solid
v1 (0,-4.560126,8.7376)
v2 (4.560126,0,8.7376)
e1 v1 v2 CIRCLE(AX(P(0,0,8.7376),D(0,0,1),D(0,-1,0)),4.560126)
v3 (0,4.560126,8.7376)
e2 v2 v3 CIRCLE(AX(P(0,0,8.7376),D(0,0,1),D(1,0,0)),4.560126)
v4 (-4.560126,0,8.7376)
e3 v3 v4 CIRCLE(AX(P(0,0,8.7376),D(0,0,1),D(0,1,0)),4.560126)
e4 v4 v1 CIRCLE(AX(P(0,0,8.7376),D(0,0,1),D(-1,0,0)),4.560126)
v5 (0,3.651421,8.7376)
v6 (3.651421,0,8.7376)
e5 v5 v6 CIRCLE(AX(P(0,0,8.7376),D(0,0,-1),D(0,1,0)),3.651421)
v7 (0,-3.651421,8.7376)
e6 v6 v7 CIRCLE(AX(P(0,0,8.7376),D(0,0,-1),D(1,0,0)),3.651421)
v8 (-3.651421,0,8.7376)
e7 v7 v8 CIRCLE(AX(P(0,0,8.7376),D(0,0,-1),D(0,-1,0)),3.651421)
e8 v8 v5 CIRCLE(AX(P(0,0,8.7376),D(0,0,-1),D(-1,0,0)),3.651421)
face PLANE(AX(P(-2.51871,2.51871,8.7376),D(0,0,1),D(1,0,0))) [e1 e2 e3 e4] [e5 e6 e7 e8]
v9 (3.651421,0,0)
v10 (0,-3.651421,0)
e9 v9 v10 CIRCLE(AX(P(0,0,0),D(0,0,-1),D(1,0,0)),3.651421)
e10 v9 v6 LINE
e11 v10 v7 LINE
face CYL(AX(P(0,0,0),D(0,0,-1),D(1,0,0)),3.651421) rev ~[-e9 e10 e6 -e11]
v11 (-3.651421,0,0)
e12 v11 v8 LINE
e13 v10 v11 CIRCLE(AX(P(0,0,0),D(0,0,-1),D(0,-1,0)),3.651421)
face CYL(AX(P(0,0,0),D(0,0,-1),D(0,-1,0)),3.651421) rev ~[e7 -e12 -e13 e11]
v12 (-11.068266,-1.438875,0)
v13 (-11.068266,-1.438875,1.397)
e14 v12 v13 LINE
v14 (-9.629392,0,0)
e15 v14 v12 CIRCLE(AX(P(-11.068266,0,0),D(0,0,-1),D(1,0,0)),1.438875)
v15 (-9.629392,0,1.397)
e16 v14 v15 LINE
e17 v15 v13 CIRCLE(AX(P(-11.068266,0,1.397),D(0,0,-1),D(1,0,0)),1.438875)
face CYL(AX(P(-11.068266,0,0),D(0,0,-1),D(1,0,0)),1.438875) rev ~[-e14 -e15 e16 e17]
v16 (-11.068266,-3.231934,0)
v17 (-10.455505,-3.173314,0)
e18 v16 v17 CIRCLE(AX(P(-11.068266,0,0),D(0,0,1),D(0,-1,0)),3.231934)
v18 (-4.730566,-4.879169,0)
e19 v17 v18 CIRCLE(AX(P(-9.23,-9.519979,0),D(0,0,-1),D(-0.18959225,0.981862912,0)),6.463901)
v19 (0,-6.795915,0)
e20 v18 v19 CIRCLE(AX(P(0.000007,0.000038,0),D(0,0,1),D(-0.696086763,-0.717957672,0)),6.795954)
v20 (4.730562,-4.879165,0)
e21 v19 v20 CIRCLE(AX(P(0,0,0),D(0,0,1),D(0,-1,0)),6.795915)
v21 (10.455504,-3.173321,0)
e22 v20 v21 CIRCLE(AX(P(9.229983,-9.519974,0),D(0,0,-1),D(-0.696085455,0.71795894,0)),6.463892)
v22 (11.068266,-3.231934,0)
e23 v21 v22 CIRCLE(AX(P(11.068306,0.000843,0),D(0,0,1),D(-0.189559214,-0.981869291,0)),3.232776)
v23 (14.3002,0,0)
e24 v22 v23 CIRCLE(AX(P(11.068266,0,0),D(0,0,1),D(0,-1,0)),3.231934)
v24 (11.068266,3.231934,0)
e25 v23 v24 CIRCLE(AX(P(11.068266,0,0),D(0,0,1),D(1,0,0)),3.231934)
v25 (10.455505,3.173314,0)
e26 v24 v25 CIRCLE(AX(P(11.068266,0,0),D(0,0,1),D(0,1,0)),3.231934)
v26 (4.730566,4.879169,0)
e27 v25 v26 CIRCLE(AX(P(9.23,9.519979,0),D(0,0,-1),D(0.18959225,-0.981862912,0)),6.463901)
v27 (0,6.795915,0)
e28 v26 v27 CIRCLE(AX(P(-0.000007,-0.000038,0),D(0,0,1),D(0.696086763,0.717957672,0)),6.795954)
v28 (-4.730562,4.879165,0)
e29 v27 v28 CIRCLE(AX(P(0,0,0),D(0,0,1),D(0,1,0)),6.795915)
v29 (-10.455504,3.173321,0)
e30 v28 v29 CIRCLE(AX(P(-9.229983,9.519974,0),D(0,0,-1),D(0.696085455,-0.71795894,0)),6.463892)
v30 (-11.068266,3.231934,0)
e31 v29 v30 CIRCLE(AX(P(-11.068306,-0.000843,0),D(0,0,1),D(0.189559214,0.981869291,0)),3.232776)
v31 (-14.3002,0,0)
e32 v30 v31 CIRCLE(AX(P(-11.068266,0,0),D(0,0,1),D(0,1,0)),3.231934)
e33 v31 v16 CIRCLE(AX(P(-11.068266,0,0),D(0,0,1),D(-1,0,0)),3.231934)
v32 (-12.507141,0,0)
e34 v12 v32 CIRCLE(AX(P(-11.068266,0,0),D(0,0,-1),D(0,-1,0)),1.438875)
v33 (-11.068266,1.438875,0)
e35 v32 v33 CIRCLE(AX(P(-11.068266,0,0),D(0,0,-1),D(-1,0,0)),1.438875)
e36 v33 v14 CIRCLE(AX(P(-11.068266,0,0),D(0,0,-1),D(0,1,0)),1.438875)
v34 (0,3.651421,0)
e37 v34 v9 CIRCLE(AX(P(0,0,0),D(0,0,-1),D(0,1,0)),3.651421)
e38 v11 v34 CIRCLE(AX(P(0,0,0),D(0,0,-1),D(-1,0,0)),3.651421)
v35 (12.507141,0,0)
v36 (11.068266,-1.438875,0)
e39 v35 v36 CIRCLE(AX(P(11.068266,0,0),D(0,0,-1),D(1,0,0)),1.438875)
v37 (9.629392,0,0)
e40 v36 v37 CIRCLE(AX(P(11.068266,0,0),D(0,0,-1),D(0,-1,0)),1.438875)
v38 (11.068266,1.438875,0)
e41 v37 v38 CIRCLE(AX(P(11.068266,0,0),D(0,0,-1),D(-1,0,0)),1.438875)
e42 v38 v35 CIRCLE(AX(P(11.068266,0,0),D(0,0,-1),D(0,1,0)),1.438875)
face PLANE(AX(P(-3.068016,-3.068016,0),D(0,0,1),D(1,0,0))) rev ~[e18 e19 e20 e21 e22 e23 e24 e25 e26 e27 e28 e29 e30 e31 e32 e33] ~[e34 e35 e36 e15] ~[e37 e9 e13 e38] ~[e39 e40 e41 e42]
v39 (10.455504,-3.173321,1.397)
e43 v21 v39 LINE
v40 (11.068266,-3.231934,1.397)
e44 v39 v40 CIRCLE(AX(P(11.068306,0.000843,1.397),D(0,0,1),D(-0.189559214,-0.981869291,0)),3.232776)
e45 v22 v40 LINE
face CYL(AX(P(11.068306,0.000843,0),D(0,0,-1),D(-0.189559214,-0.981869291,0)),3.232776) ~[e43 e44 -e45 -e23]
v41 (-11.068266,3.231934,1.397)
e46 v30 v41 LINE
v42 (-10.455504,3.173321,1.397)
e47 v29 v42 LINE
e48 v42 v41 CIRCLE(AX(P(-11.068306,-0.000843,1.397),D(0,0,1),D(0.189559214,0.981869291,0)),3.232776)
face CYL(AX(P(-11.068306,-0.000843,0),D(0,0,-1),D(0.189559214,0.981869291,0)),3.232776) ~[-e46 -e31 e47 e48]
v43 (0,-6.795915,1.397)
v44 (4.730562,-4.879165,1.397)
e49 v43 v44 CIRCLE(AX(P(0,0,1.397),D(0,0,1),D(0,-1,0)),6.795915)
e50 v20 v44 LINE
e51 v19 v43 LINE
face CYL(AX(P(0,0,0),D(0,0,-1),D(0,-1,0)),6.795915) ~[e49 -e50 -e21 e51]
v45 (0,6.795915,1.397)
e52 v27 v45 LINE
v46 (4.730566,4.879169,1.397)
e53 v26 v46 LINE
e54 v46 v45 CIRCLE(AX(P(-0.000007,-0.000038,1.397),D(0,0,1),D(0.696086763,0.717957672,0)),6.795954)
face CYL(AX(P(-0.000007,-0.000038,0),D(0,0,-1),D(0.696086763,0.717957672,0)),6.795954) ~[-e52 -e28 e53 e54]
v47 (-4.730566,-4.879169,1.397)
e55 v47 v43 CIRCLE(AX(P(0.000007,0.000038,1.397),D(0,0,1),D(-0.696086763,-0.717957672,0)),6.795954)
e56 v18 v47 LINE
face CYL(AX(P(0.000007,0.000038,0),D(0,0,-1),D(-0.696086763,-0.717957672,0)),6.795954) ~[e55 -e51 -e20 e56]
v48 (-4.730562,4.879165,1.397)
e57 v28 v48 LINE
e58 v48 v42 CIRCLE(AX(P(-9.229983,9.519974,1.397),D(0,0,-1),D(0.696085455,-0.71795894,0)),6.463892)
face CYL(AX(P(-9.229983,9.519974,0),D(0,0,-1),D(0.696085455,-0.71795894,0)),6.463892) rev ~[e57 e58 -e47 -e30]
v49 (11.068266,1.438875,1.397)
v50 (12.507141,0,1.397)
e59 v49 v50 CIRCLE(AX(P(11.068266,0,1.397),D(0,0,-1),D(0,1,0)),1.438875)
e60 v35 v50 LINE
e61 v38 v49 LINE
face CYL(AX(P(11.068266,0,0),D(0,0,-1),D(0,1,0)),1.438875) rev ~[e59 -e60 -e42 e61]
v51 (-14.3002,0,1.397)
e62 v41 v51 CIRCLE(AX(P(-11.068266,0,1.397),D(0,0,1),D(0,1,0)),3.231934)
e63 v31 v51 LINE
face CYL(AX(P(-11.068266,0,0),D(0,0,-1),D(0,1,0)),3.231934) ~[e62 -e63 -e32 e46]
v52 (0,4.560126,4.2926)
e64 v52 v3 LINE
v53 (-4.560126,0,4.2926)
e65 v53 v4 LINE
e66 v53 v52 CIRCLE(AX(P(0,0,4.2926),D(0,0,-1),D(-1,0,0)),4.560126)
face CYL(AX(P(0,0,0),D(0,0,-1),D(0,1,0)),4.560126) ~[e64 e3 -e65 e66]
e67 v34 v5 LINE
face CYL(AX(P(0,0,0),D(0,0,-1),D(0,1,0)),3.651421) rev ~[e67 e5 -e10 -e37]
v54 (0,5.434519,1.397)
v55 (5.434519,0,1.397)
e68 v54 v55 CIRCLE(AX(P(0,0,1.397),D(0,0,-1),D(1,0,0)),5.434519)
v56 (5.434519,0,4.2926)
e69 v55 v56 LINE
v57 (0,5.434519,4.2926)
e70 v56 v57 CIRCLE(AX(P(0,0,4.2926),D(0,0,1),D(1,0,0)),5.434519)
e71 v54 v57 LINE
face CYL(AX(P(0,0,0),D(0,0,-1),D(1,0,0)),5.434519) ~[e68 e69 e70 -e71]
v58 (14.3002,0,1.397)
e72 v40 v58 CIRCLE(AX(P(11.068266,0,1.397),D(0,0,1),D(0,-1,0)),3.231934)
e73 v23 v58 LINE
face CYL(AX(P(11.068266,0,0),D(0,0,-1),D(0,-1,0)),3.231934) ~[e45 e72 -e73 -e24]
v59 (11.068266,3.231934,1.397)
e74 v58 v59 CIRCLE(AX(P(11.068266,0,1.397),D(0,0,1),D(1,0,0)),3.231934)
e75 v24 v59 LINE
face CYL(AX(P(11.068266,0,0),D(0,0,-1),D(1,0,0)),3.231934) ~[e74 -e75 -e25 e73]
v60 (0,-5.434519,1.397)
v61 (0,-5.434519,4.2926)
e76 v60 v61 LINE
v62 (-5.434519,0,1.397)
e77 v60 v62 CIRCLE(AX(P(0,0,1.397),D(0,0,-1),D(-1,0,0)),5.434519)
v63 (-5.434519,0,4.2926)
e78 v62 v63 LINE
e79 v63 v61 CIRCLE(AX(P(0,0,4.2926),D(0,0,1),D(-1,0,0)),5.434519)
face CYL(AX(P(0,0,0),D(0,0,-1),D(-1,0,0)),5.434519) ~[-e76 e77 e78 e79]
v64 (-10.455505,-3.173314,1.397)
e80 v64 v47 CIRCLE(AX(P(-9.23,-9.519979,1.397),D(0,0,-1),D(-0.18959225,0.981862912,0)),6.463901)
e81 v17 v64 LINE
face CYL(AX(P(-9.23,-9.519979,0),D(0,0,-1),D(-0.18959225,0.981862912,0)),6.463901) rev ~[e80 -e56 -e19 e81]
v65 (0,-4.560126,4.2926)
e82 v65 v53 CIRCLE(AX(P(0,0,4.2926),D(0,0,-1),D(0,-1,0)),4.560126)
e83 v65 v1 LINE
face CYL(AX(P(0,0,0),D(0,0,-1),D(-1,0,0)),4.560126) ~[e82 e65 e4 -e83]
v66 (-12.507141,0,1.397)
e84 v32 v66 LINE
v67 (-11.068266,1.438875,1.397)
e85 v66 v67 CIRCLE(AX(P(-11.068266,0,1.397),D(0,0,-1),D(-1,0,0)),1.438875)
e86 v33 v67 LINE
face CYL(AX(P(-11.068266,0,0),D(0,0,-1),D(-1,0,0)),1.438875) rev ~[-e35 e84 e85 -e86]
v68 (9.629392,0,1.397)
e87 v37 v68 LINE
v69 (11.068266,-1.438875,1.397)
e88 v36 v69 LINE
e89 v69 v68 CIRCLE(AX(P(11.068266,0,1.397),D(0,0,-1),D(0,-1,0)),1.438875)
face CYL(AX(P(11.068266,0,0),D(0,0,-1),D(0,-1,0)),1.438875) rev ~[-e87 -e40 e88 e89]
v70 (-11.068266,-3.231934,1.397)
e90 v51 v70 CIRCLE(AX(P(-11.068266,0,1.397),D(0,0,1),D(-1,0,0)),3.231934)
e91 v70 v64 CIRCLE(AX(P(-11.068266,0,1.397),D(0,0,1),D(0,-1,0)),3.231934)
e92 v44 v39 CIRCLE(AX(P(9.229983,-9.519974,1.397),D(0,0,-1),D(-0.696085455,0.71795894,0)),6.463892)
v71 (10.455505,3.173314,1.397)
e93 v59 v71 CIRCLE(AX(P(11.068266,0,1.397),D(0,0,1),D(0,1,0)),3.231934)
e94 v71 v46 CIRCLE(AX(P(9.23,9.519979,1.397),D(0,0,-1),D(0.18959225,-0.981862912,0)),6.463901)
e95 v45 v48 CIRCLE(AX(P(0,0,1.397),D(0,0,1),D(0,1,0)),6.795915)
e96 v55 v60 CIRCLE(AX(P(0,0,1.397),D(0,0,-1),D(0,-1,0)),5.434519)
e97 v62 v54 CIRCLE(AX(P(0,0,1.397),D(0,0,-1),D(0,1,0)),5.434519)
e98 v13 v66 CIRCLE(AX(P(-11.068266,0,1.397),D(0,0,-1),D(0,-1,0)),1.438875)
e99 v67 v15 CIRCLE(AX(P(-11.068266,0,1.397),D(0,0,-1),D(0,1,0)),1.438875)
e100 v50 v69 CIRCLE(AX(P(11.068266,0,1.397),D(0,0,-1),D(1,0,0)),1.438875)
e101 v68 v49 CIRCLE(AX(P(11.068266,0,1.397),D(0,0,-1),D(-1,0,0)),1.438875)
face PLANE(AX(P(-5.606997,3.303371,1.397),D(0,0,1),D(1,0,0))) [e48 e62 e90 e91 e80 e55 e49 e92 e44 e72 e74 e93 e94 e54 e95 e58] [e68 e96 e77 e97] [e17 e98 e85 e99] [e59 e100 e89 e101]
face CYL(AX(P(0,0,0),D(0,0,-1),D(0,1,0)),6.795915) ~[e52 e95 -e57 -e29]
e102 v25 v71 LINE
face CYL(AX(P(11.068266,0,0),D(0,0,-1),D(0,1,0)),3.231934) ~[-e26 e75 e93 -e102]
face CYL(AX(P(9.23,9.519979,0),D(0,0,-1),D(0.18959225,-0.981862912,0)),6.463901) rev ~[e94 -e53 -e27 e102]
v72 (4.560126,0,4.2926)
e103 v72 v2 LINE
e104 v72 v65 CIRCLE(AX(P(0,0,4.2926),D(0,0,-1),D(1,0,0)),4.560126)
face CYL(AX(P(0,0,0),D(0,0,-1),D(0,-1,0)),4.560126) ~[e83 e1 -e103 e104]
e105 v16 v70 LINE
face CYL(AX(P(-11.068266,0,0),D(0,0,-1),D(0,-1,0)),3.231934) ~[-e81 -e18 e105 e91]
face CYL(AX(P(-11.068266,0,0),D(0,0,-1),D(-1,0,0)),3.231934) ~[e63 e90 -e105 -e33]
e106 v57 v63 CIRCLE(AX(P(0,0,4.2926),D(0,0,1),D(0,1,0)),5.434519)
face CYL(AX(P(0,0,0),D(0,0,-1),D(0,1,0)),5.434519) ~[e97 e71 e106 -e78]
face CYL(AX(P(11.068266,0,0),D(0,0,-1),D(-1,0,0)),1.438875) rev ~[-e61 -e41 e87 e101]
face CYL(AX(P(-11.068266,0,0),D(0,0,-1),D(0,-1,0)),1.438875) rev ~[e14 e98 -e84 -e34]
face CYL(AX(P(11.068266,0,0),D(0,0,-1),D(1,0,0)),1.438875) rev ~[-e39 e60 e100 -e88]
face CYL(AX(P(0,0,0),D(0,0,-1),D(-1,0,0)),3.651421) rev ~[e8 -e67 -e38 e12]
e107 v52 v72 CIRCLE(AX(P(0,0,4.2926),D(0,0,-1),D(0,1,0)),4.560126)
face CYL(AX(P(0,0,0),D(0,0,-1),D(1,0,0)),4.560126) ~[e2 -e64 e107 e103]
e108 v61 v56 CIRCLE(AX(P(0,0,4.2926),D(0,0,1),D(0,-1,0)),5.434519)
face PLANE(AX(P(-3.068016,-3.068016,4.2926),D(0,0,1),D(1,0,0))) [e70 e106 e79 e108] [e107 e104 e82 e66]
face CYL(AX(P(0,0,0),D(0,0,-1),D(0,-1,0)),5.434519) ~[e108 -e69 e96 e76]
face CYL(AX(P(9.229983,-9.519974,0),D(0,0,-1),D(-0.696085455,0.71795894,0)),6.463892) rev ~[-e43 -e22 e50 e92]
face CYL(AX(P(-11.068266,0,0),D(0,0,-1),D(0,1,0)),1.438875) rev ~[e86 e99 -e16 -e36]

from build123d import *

# Parameters (mm, degrees)
F1_DEPTH = 1.397
F2_DEPTH = 8.7376
F3_DEPTH = 4.2926


# Not quite as in the source:
# - ends of sketch curves that miss each other by under 0.0002 mm in the source are joined


with BuildPart() as f1:
    # F0 (on Top) → F1 (new body)
    with BuildSketch(Plane.XY):
        with BuildLine():
            ThreePointArc((-5.4345187307, 0), (-3.8427850469, 3.8427850469), (0, 5.4345187307))
            Line((0, 5.4345187307), (0, 6.7959154799))
            ThreePointArc((0, 6.7959154799), (-2.5520653679, 6.2985259837), (-4.7305620794, 4.8791648489))
            ThreePointArc((-4.7305620794, 4.8791648489), (-7.3841557332, 3.3252325154), (-10.4555039298, 3.1733212198))
            ThreePointArc((-10.4555039298, 3.1733212198), (-10.7604870325, 3.2172453575), (-11.0682662539, 3.2319337461))
            Line((-11.0682662539, 3.2319337461), (-11.0682662539, 1.438874613))
            ThreePointArc((-11.0682662539, 1.438874613), (-10.0508282577, 1.0174379961), (-9.6293916409, 0))
            Line((-9.6293916409, 0), (-5.4345187307, 0))
        make_face()
        with BuildLine():
            ThreePointArc((-12.5071408669, 0), (-12.08570425, 1.0174379961), (-11.0682662539, 1.438874613))
            Line((-11.0682662539, 1.438874613), (-11.0682662539, 3.2319337461))
            ThreePointArc((-11.0682662539, 3.2319337461), (-13.3535885221, 2.2853222682), (-14.3002, 0))
            Line((-14.3002, 0), (-12.5071408669, 0))
        make_face()
        with BuildLine():
            Line((-11.0682662539, -3.2319337461), (-11.0682662539, -1.438874613))
            ThreePointArc((-11.0682662539, -1.438874613), (-12.08570425, -1.0174379961), (-12.5071408669, 0))
            Line((-12.5071408669, 0), (-14.3002, 0))
            ThreePointArc((-14.3002, 0), (-13.3535885221, -2.2853222682), (-11.0682662539, -3.2319337461))
        make_face()
        with BuildLine():
            Line((0, -6.7959154799), (0, -5.4345187307))
            ThreePointArc((0, -5.4345187307), (-3.8427850469, -3.8427850469), (-5.4345187307, 0))
            Line((-5.4345187307, 0), (-9.6293916409, 0))
            ThreePointArc((-9.6293916409, 0), (-10.0508282577, -1.0174379961), (-11.0682662539, -1.438874613))
            Line((-11.0682662539, -1.438874613), (-11.0682662539, -3.2319337461))
            ThreePointArc((-11.0682662539, -3.2319337461), (-10.7604870325, -3.2172453575), (-10.4555053814, -3.1733137022))
            ThreePointArc((-10.4555053814, -3.1733137022), (-7.3841557332, -3.3252325154), (-4.7305659764, -4.8791688684))
            ThreePointArc((-4.7305659764, -4.8791688684), (-2.5520653679, -6.2985259837), (0, -6.7959154799))
        make_face()
        with BuildLine():
            ThreePointArc((0, -5.4345187307), (3.8427850469, -3.8427850469), (5.4345187307, 0))
            Line((5.4345187307, 0), (4.5601256966, 0))
            ThreePointArc((4.5601256966, 0), (3.2244958031, -3.2244958031), (0, -4.5601256966))
            Line((0, -4.5601256966), (0, -5.4345187307))
        make_face()
        with BuildLine():
            ThreePointArc((-5.4345187307, 0), (-3.8427850469, -3.8427850469), (0, -5.4345187307))
            Line((0, -5.4345187307), (0, -4.5601256966))
            ThreePointArc((0, -4.5601256966), (-3.2244958031, -3.2244958031), (-4.5601256966, 0))
            Line((-4.5601256966, 0), (-5.4345187307, 0))
        make_face()
        with BuildLine():
            Line((0, 4.5601256966), (0, 5.4345187307))
            ThreePointArc((0, 5.4345187307), (-3.8427850469, 3.8427850469), (-5.4345187307, 0))
            Line((-5.4345187307, 0), (-4.5601256966, 0))
            ThreePointArc((-4.5601256966, 0), (-3.2244958031, 3.2244958031), (0, 4.5601256966))
        make_face()
        with BuildLine():
            Line((4.5601256966, 0), (5.4345187307, 0))
            ThreePointArc((5.4345187307, 0), (3.8427850469, 3.8427850469), (0, 5.4345187307))
            Line((0, 5.4345187307), (0, 4.5601256966))
            ThreePointArc((0, 4.5601256966), (3.2244958031, 3.2244958031), (4.5601256966, 0))
        make_face()
        with BuildLine():
            ThreePointArc((0, 5.4345187307), (3.8427850469, 3.8427850469), (5.4345187307, 0))
            Line((5.4345187307, 0), (9.6293916409, 0))
            ThreePointArc((9.6293916409, 0), (10.0508282577, 1.0174379961), (11.0682662539, 1.438874613))
            Line((11.0682662539, 1.438874613), (11.0682662539, 3.2319337461))
            ThreePointArc((11.0682662539, 3.2319337461), (10.7604870325, 3.2172453575), (10.4555053814, 3.1733137022))
            ThreePointArc((10.4555053814, 3.1733137022), (7.3841557332, 3.3252325154), (4.7305659764, 4.8791688684))
            ThreePointArc((4.7305659764, 4.8791688684), (2.5520653679, 6.2985259837), (0, 6.7959154799))
            Line((0, 6.7959154799), (0, 5.4345187307))
        make_face()
        with BuildLine():
            Line((9.6293916409, 0), (5.4345187307, 0))
            ThreePointArc((5.4345187307, 0), (3.8427850469, -3.8427850469), (0, -5.4345187307))
            Line((0, -5.4345187307), (0, -6.7959154799))
            ThreePointArc((0, -6.7959154799), (2.5520653679, -6.2985259837), (4.7305620794, -4.8791648489))
            ThreePointArc((4.7305620794, -4.8791648489), (7.3841557332, -3.3252325154), (10.4555039298, -3.1733212198))
            ThreePointArc((10.4555039298, -3.1733212198), (10.7604870325, -3.2172453575), (11.0682662539, -3.2319337461))
            Line((11.0682662539, -3.2319337461), (11.0682662539, -1.438874613))
            ThreePointArc((11.0682662539, -1.438874613), (10.0508282577, -1.0174379961), (9.6293916409, 0))
        make_face()
        with BuildLine():
            ThreePointArc((12.5071408669, 0), (12.08570425, -1.0174379961), (11.0682662539, -1.438874613))
            Line((11.0682662539, -1.438874613), (11.0682662539, -3.2319337461))
            ThreePointArc((11.0682662539, -3.2319337461), (13.3535885221, -2.2853222682), (14.3002, 0))
            Line((14.3002, 0), (12.5071408669, 0))
        make_face()
        with BuildLine():
            Line((11.0682662539, 3.2319337461), (11.0682662539, 1.438874613))
            ThreePointArc((11.0682662539, 1.438874613), (12.08570425, 1.0174379961), (12.5071408669, 0))
            Line((12.5071408669, 0), (14.3002, 0))
            ThreePointArc((14.3002, 0), (13.3535885221, 2.2853222682), (11.0682662539, 3.2319337461))
        make_face()
    extrude(amount=F1_DEPTH)

    # F0 (on Top) → F2 (join)
    with BuildSketch(Plane.XY):
        with BuildLine():
            Line((0, 3.6514210372), (0, 4.5601256966))
            ThreePointArc((0, 4.5601256966), (-3.2244958031, 3.2244958031), (-4.5601256966, 0))
            Line((-4.5601256966, 0), (-3.6514210372, 0))
            ThreePointArc((-3.6514210372, 0), (-2.5819445763, 2.5819445763), (0, 3.6514210372))
        make_face()
        with BuildLine():
            Line((3.6514210372, 0), (4.5601256966, 0))
            ThreePointArc((4.5601256966, 0), (3.2244958031, 3.2244958031), (0, 4.5601256966))
            Line((0, 4.5601256966), (0, 3.6514210372))
            ThreePointArc((0, 3.6514210372), (2.5819445763, 2.5819445763), (3.6514210372, 0))
        make_face()
        with BuildLine():
            ThreePointArc((0, -4.5601256966), (3.2244958031, -3.2244958031), (4.5601256966, 0))
            Line((4.5601256966, 0), (3.6514210372, 0))
            ThreePointArc((3.6514210372, 0), (2.5819445763, -2.5819445763), (0, -3.6514210372))
            Line((0, -3.6514210372), (0, -4.5601256966))
        make_face()
        with BuildLine():
            ThreePointArc((-4.5601256966, 0), (-3.2244958031, -3.2244958031), (0, -4.5601256966))
            Line((0, -4.5601256966), (0, -3.6514210372))
            ThreePointArc((0, -3.6514210372), (-2.5819445763, -2.5819445763), (-3.6514210372, 0))
            Line((-3.6514210372, 0), (-4.5601256966, 0))
        make_face()
    extrude(amount=F2_DEPTH)

    # F0 (on Top) → F3 (join)
    with BuildSketch(Plane.XY):
        with BuildLine():
            ThreePointArc((-5.4345187307, 0), (-3.8427850469, -3.8427850469), (0, -5.4345187307))
            Line((0, -5.4345187307), (0, -4.5601256966))
            ThreePointArc((0, -4.5601256966), (-3.2244958031, -3.2244958031), (-4.5601256966, 0))
            Line((-4.5601256966, 0), (-5.4345187307, 0))
        make_face()
        with BuildLine():
            ThreePointArc((0, -5.4345187307), (3.8427850469, -3.8427850469), (5.4345187307, 0))
            Line((5.4345187307, 0), (4.5601256966, 0))
            ThreePointArc((4.5601256966, 0), (3.2244958031, -3.2244958031), (0, -4.5601256966))
            Line((0, -4.5601256966), (0, -5.4345187307))
        make_face()
        with BuildLine():
            Line((4.5601256966, 0), (5.4345187307, 0))
            ThreePointArc((5.4345187307, 0), (3.8427850469, 3.8427850469), (0, 5.4345187307))
            Line((0, 5.4345187307), (0, 4.5601256966))
            ThreePointArc((0, 4.5601256966), (3.2244958031, 3.2244958031), (4.5601256966, 0))
        make_face()
        with BuildLine():
            Line((0, 4.5601256966), (0, 5.4345187307))
            ThreePointArc((0, 5.4345187307), (-3.8427850469, 3.8427850469), (-5.4345187307, 0))
            Line((-5.4345187307, 0), (-4.5601256966, 0))
            ThreePointArc((-4.5601256966, 0), (-3.2244958031, 3.2244958031), (0, 4.5601256966))
        make_face()
    extrude(amount=F3_DEPTH)


solid = f1.part
